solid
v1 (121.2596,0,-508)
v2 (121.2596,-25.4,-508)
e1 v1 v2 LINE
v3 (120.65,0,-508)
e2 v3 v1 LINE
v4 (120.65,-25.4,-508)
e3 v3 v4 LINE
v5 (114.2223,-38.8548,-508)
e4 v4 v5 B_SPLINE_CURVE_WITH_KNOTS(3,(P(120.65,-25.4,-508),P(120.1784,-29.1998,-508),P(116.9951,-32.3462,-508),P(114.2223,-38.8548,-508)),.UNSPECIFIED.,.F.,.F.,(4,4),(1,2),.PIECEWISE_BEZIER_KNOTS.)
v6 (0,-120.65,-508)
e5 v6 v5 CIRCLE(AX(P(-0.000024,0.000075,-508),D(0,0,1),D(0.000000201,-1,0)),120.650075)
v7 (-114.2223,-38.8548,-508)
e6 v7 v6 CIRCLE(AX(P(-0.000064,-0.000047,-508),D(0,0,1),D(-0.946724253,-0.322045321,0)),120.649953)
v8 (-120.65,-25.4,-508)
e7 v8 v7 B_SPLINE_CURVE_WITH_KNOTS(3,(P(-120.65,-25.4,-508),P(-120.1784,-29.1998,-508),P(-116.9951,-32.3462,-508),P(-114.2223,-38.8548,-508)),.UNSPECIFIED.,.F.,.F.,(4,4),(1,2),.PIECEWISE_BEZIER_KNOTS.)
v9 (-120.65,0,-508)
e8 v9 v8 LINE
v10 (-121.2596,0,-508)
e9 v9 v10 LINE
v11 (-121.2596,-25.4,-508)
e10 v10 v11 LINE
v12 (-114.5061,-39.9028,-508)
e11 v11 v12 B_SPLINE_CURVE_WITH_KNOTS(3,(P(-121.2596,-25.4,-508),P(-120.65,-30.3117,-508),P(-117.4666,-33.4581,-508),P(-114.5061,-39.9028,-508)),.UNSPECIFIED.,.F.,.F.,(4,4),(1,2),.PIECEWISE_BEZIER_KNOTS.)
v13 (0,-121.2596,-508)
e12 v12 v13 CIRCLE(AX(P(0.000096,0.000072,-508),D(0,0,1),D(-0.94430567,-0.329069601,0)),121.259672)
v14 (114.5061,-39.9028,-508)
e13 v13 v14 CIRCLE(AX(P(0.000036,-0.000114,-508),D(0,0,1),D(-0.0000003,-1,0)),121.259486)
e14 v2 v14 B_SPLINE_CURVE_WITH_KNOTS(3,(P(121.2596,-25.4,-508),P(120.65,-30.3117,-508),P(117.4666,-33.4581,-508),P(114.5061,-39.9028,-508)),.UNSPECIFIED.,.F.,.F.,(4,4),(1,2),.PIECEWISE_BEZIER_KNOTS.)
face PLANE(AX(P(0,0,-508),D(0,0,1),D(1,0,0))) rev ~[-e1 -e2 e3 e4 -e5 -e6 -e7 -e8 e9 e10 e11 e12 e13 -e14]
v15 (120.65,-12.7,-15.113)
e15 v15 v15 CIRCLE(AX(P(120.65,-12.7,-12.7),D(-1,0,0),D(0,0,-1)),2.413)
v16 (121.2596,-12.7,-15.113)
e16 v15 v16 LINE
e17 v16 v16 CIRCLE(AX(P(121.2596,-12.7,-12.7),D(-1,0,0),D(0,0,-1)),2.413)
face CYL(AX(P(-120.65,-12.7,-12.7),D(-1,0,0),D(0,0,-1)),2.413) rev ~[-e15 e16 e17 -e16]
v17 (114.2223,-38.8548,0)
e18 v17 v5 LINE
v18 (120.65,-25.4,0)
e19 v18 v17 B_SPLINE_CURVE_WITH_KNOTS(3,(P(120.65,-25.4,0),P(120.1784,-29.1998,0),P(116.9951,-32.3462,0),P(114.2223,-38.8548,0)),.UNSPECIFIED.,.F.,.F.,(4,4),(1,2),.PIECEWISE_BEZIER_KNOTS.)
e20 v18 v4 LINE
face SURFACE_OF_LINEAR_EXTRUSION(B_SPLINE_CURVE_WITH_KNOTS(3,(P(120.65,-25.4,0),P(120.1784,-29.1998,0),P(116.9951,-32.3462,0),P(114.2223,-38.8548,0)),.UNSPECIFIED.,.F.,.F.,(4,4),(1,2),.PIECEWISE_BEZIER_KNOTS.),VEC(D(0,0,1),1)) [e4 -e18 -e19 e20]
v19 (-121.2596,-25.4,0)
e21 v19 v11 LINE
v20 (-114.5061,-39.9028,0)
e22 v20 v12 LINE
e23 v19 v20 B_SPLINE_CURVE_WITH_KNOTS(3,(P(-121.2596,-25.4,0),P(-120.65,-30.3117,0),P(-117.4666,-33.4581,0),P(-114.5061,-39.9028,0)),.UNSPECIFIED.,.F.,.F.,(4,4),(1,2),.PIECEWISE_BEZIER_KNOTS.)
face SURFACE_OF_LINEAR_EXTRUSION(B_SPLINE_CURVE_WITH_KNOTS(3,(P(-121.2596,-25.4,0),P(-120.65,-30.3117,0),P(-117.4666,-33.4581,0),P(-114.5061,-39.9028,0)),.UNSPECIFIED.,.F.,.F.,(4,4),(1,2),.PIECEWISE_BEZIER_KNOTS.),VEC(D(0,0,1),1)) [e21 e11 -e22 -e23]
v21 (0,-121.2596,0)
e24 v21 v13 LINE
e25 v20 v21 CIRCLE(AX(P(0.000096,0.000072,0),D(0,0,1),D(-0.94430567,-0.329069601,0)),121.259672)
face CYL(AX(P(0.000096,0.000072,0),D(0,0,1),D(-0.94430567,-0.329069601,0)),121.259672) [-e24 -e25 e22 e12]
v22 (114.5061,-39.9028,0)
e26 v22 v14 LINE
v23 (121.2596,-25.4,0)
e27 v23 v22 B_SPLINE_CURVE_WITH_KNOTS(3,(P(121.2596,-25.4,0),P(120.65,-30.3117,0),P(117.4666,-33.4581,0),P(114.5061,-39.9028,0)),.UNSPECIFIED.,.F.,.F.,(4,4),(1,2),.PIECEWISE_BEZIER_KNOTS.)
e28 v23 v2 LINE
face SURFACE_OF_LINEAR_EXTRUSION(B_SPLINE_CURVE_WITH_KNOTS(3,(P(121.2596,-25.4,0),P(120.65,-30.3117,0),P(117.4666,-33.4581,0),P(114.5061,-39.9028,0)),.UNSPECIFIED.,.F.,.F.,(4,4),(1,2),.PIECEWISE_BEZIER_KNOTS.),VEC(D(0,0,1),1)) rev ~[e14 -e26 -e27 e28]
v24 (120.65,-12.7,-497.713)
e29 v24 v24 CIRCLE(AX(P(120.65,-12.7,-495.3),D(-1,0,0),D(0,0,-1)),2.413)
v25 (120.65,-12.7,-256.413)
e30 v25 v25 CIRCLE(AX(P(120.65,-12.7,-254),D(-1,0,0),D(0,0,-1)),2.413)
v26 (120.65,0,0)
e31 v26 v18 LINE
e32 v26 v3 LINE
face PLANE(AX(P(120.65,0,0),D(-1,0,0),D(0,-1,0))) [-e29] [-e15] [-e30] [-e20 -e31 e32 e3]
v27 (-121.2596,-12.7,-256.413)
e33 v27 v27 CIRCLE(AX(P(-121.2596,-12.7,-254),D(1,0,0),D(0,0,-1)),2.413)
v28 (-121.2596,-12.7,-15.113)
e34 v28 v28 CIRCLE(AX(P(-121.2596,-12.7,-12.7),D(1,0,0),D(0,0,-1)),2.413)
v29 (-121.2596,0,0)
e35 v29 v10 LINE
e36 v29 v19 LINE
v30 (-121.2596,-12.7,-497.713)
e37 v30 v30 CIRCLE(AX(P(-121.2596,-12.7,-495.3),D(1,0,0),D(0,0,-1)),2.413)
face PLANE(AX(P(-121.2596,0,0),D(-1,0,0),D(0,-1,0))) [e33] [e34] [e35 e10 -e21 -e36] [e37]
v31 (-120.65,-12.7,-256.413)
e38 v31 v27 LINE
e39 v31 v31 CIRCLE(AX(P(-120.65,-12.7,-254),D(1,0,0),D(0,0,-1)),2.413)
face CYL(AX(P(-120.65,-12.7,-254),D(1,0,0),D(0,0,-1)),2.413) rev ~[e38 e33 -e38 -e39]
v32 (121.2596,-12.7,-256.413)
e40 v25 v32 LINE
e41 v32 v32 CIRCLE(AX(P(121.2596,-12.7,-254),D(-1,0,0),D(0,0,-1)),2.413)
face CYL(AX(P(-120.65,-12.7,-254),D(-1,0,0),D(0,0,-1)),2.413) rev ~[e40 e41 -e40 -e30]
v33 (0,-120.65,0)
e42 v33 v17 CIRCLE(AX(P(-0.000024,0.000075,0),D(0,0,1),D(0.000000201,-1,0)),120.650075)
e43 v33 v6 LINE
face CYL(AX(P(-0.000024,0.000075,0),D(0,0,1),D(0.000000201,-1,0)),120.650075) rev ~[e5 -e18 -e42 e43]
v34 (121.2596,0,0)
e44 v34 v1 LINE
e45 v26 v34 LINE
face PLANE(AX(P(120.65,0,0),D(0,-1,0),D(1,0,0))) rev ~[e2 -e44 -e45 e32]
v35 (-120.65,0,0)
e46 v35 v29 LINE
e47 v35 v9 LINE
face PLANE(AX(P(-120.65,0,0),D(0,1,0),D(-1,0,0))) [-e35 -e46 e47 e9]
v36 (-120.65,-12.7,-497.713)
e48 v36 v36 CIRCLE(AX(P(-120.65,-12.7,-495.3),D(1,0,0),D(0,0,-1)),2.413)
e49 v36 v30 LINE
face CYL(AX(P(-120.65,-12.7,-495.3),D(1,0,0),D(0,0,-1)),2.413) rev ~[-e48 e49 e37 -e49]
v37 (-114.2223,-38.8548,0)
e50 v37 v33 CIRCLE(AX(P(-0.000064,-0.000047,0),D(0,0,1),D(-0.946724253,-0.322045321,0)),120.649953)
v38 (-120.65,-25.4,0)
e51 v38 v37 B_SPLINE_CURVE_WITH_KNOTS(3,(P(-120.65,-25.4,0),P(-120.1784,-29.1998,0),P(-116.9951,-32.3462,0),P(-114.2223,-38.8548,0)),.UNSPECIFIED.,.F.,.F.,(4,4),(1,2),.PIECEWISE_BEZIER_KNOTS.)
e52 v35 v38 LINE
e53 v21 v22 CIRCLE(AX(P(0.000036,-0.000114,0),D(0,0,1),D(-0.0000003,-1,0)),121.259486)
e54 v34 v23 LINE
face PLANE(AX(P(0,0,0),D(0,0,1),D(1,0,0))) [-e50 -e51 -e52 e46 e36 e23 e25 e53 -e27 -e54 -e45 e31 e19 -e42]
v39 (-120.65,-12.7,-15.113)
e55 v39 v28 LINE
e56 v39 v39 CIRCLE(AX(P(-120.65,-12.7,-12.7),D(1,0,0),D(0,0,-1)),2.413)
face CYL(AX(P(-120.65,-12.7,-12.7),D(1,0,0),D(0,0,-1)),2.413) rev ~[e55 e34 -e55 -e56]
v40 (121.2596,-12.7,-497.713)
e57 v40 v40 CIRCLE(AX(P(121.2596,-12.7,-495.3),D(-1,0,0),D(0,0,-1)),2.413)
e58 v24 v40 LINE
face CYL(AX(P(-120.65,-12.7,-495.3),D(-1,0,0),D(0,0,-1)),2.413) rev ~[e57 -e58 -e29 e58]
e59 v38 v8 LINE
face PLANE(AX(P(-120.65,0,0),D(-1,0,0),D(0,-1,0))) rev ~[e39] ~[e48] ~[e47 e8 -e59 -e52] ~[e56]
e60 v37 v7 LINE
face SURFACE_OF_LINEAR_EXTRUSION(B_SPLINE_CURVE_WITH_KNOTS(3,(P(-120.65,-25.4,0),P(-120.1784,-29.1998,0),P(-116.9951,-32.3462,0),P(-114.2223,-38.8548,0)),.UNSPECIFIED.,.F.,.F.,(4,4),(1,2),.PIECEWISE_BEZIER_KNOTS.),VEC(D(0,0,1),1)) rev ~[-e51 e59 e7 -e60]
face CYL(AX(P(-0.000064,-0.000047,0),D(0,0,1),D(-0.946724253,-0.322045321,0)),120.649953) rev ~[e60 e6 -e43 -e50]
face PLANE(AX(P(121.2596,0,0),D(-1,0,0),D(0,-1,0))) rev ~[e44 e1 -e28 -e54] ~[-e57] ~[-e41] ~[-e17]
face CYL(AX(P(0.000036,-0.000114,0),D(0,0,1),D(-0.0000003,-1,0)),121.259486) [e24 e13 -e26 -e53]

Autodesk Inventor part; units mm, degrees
ref_plane "YZ Plane" through (0, 0, 0) normal (1, 0, 0) x (0, 1, 0)
ref_plane "XZ Plane" through (0, 0, 0) normal (0, 1, 0) x (-1, 0, 0)
ref_plane "XY Plane" through (0, 0, 0) normal (0, 0, 1) x (1, 0, 0)
sketch "Sketch1" plane through (0, 0, 0) normal (0, 0, 1) x (1, 0, 0)
  arc A0 (-114.2223, -38.8548) -> (0, -120.65) centre (0, 0) ccw
  line L0 (-120.65, 0) -> (-121.2596, 0)
  line L1 (120.65, 0) -> (121.2596, 0)
  line L2 (-121.2596, 0) -> (-121.2596, -25.4)
  line L3 (-120.65, 0) -> (-120.65, -25.4)
  line L4 (-121.2596, -25.4) -> (-120.65, -30.3117) construction
  line L5 (-120.65, -30.3117) -> (-117.4666, -33.4581) construction
  line L6 (-117.4666, -33.4581) -> (-114.5061, -39.9028) construction
  spline S0 degree 3 poles (-121.2596, -25.4) (-120.65, -30.3117) (-117.4666, -33.4581) (-114.5061, -39.9028) knots 1 1 1 1 2 2 2 2
  line L7 (-120.65, -25.4) -> (-120.1784, -29.1998) construction
  line L8 (-120.1784, -29.1998) -> (-116.9951, -32.3462) construction
  line L9 (-116.9951, -32.3462) -> (-114.2223, -38.8548) construction
  spline S1 degree 3 poles (-120.65, -25.4) (-120.1784, -29.1998) (-116.9951, -32.3462) (-114.2223, -38.8548) knots 1 1 1 1 2 2 2 2
  arc A1 (-114.5061, -39.9028) -> (0, -121.2596) centre (0, 0) ccw
  line L10 (0, 0) -> (0, -121.2596)
  arc A2 (0, -120.65) -> (114.2223, -38.8548) centre (0, 0) ccw
  line L11 (120.65, 0) -> (121.2596, 0)
  line L12 (121.2596, 0) -> (121.2596, -25.4)
  line L13 (120.65, 0) -> (120.65, -25.4)
  line L14 (121.2596, -25.4) -> (120.65, -30.3117) construction
  line L15 (120.65, -30.3117) -> (117.4666, -33.4581) construction
  line L16 (117.4666, -33.4581) -> (114.5061, -39.9028) construction
  spline S2 degree 3 poles (121.2596, -25.4) (120.65, -30.3117) (117.4666, -33.4581) (114.5061, -39.9028) knots 1 1 1 1 2 2 2 2
  spline S3 degree 3 poles (120.65, -25.4) (120.1784, -29.1998) (116.9951, -32.3462) (114.2223, -38.8548) knots 1 1 1 1 2 2 2 2
  line L17 (120.65, -25.4) -> (120.1784, -29.1998) construction
  line L18 (120.1784, -29.1998) -> (116.9951, -32.3462) construction
  line L19 (116.9951, -32.3462) -> (114.2223, -38.8548) construction
  arc A3 (0, -121.2596) -> (114.5061, -39.9028) centre (0, 0) ccw
  dimension "d0" = 241.3
  dimension "d1" = 0.6096
  dimension "d2" = 0.6096
  dimension "d5" = 25.4
  dimension "d6" = 25.4
  dimension "d7" = 1.1119
  dimension "d8" = 1.1119
  dimension "d9" = 3.1463
  dimension "d10" = 3.1833
  dimension "d11" = 0.6096
  dimension "d12" = 3.1833
  dimension "d14" = 14.5028
  dimension "d15" = 3.7998
extrude "Extrusion1" add sketch "Sketch1" against normal blind 508
sketch "Sketch2" plane through (-120.65, -25.4, 0) normal (1, 0, 0) x (0, 0, -1)
  line L0 (0, 25.4) -> (0, 0) projected
  line L1 (0, 25.4) -> (508, 25.4) projected
  line L2 (508, 0) -> (508, 25.4) projected
  line L3 (0, 0) -> (508, 0) projected
  circle A0 centre (12.7, 12.7) radius 2.413
  circle A1 centre (254, 12.7) radius 2.413
  circle A2 centre (495.3, 12.7) radius 2.413
  dimension "d18" = 4.826
  dimension "d19" = 12.7
  dimension "d20" = 12.7
  dimension "d23" = 241.3
extrude "Extrusion2" cut sketch "Sketch2" along normal mid plane 560.3875 contours A0 | A1 | A2
properties part number "Ballslide"
